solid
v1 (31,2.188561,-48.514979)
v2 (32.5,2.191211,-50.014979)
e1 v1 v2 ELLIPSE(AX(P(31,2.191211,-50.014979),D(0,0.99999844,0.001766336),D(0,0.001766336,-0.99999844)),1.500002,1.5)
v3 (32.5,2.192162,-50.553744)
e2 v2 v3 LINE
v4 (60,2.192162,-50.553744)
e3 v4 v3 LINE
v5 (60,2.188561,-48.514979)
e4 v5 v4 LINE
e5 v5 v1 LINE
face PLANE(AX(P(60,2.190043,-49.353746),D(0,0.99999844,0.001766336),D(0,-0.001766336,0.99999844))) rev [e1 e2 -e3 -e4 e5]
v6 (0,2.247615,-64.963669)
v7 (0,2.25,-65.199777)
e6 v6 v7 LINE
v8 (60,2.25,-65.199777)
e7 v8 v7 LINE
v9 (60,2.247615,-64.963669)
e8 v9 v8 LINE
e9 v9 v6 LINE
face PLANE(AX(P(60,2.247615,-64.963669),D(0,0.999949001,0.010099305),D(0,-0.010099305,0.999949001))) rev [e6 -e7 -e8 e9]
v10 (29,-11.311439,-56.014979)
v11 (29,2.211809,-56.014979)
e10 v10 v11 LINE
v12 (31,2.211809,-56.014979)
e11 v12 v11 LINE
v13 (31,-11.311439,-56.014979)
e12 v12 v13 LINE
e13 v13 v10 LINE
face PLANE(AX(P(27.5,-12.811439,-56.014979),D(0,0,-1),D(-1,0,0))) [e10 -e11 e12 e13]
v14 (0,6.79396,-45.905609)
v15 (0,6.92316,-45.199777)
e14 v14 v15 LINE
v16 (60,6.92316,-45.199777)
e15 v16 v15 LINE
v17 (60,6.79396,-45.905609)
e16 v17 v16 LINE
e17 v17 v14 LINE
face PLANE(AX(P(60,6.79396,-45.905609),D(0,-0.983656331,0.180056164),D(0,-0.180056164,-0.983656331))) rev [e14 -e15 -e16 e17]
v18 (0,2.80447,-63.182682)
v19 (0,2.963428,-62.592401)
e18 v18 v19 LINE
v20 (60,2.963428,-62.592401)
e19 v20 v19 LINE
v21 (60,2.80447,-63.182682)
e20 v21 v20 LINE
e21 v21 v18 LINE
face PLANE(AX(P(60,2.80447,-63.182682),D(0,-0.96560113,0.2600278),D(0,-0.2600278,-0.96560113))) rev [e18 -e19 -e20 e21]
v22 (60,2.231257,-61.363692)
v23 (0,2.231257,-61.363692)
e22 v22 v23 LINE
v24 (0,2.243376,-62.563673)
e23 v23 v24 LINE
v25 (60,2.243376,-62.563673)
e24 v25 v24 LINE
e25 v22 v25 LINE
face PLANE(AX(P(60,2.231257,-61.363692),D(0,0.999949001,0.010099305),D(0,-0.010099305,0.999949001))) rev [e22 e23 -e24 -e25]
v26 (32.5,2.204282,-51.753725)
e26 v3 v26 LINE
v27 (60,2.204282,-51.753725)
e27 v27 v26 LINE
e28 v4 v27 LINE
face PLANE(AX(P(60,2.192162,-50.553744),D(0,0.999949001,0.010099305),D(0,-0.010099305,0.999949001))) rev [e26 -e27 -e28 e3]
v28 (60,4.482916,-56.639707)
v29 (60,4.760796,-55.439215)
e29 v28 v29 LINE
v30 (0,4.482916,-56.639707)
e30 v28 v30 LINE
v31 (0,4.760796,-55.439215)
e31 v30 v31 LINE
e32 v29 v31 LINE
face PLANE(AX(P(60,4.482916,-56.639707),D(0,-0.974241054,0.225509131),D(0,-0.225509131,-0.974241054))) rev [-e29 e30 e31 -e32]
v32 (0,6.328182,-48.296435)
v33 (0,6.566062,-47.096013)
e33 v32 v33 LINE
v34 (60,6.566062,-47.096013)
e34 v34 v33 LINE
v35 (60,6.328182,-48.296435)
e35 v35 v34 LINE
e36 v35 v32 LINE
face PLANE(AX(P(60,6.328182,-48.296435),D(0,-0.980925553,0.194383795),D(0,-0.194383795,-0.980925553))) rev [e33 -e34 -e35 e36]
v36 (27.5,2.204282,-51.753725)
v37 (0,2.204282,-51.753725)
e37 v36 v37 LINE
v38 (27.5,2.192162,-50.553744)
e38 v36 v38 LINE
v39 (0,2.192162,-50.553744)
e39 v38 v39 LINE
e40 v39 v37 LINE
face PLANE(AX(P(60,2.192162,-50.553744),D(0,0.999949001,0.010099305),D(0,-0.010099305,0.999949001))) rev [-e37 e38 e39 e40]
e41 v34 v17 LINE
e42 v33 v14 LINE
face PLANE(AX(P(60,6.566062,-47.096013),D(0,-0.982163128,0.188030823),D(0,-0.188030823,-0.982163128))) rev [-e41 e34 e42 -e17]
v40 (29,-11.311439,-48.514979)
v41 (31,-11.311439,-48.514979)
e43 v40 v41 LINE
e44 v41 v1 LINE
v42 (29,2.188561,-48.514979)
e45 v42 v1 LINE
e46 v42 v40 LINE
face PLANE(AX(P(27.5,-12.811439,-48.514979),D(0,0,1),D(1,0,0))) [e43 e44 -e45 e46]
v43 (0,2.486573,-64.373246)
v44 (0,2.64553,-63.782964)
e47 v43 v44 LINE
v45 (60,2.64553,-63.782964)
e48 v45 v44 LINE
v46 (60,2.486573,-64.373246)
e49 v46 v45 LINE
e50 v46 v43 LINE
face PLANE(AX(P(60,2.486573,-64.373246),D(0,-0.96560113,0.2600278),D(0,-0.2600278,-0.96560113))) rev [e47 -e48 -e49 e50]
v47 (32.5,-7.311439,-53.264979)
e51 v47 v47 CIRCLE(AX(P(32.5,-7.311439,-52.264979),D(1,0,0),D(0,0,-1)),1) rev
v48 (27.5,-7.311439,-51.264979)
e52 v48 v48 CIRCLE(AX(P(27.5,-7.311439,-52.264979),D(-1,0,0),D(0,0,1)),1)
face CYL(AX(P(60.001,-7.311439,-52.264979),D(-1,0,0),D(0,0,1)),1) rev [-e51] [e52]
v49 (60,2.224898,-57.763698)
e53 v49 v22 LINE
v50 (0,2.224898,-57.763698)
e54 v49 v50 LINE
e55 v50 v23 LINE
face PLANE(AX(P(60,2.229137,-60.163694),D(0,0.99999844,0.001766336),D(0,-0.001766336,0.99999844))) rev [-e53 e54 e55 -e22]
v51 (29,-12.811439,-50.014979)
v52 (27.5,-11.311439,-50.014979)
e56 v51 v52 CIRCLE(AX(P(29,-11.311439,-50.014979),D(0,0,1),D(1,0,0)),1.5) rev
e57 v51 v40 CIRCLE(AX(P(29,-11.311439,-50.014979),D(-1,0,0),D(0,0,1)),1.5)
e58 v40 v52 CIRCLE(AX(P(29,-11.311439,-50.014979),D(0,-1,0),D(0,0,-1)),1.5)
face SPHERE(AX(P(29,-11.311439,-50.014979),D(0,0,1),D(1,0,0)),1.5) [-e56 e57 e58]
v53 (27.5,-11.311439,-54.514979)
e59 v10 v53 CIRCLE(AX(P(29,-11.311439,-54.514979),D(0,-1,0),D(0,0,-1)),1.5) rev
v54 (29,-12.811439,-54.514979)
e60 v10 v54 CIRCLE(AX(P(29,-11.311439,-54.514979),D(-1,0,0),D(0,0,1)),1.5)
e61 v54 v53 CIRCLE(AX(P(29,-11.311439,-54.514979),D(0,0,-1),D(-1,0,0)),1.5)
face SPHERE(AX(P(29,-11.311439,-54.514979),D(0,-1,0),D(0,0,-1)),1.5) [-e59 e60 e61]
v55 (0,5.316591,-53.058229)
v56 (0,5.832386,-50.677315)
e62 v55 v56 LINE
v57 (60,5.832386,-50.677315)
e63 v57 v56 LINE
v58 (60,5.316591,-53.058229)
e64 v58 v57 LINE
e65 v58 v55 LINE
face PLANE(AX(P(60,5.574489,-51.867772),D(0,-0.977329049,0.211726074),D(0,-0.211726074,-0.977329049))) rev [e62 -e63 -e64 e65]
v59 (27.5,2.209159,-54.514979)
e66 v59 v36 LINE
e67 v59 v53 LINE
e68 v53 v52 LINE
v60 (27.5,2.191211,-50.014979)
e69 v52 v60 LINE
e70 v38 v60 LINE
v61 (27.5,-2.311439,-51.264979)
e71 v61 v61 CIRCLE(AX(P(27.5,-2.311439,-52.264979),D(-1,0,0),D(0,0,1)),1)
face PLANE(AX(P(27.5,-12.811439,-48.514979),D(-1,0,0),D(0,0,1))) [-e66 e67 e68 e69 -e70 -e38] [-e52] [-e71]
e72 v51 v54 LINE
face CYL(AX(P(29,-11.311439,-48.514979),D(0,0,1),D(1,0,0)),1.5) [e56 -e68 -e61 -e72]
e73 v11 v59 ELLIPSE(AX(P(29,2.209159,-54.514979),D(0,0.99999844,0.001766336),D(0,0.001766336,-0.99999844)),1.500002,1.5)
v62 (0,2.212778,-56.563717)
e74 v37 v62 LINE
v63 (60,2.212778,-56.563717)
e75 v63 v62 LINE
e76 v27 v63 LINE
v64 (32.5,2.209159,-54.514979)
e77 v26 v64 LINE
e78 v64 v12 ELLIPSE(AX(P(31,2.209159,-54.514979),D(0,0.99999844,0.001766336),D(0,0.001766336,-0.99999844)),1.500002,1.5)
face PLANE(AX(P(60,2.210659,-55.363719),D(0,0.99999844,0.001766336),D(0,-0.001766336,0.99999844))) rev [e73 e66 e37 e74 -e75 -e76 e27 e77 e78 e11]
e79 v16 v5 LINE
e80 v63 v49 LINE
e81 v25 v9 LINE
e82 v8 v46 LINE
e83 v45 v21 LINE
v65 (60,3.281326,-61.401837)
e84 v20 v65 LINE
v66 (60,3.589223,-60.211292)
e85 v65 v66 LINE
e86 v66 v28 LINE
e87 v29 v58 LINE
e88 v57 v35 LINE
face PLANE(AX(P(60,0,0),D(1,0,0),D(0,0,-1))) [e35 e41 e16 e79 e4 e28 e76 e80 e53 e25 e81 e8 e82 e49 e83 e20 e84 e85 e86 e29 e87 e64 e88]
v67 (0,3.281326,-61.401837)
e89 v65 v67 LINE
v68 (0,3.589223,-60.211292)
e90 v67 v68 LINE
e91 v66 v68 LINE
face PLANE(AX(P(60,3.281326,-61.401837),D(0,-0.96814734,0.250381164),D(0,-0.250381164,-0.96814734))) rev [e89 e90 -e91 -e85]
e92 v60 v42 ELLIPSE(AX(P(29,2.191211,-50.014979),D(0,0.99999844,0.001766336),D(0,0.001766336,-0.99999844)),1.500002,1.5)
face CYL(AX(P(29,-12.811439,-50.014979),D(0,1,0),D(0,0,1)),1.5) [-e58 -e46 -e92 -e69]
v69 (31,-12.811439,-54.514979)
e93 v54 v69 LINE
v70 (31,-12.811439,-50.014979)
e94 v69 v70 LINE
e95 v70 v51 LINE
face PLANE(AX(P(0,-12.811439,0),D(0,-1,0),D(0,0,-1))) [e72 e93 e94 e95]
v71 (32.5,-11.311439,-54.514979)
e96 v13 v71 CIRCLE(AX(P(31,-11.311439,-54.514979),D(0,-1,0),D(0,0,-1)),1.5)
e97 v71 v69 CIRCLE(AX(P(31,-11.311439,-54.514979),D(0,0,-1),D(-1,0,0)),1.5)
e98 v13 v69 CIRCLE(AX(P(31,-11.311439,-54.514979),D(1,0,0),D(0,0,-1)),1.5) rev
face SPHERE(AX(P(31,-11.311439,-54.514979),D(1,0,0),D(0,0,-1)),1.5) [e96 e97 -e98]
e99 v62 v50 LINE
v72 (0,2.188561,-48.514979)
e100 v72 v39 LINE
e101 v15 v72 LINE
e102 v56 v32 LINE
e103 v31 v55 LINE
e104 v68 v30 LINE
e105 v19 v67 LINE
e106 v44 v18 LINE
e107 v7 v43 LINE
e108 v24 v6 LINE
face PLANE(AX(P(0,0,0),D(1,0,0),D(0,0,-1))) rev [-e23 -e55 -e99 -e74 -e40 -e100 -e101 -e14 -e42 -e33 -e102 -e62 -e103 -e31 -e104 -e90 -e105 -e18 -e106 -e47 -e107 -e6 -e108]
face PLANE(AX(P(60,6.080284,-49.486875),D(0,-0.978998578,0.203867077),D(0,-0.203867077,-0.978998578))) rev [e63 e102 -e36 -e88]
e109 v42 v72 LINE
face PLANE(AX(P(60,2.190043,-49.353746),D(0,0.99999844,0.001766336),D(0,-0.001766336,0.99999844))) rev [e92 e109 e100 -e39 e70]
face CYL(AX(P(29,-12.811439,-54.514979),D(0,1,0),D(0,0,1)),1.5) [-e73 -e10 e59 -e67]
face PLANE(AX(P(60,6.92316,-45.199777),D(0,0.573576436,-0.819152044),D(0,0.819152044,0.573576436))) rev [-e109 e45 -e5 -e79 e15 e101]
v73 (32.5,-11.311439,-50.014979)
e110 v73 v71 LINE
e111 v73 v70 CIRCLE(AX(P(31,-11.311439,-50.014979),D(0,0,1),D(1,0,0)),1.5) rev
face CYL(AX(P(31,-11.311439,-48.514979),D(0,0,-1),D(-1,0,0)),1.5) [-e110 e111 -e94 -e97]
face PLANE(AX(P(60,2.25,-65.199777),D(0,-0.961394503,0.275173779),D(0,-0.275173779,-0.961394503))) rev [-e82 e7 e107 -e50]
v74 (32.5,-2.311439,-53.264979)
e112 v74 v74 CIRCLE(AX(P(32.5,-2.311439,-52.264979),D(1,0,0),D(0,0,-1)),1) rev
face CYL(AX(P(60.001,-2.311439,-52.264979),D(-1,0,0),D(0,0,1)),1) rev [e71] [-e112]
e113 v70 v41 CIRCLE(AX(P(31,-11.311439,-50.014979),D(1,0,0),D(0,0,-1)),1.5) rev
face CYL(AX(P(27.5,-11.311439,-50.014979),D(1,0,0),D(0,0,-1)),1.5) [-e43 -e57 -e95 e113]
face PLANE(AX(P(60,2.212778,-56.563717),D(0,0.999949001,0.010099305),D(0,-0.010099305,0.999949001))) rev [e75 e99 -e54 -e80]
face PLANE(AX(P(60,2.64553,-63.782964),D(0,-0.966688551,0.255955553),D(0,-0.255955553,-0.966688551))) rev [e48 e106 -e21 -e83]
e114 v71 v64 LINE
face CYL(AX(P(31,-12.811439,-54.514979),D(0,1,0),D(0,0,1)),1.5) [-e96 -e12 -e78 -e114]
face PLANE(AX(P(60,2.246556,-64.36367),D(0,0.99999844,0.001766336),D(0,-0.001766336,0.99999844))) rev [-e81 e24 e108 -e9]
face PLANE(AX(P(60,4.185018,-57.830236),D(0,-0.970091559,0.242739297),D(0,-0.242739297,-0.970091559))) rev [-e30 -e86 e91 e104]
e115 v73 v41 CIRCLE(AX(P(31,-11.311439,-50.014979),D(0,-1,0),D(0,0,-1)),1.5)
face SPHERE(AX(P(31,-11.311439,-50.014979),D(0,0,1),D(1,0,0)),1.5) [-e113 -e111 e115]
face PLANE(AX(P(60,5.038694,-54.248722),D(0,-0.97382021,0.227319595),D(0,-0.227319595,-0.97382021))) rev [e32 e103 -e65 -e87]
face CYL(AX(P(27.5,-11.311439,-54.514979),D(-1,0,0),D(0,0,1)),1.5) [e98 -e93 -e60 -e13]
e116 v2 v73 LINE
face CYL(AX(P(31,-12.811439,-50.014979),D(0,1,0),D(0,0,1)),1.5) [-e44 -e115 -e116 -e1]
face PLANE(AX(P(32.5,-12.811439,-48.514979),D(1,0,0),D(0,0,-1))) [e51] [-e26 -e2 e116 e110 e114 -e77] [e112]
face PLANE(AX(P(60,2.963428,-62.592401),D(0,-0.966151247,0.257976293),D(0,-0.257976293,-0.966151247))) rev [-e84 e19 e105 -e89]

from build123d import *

# Parameters (mm, degrees)
BOSS_EXTRUDE1_DEPTH             = 60
BOSS_EXTRUDE2_REACH             = 90.732
SKETCH5_W                       = 5
SKETCH5_H                       = 7.5
BOSS_EXTRUDE2_DIRECTION_2_DEPTH = 15
FILLET1_R                       = 1.5
CUT_EXTRUDE1_REACH              = 75.969
SKETCH6_R                       = 1


# Read off the part's stored shape, not the designer's step: Boss-Extrude1
with BuildPart() as part:
    # Boss-Extrude1 outline → Boss-Extrude1 (new body)
    with BuildSketch(Plane(origin=(0, 0, 0), x_dir=(0, 0, -1), z_dir=(1, 0, 0))):
        Polygon((45.19977735, 6.923160404), (48.514979298, 2.188561349), (50.553744228, 2.192162497), (51.753724693, 2.204282084), (56.563717189, 2.212778158), (57.763697654, 2.224897745), (61.363692038, 2.231256553), (62.563672503, 2.24337614), (64.963668759, 2.247615346), (65.19977735, 2.25), (64.373245759, 2.486572833), (63.782964065, 2.645530446), (63.182682388, 2.804470395), (62.592400694, 2.963428007), (61.401837323, 3.281325569), (60.211291616, 3.589223146), (56.639707483, 4.482915924), (55.439214781, 4.760795885), (53.058229346, 5.316591132), (50.677314564, 5.832386443), (48.296435109, 6.328181784), (47.09601306, 6.566061807), (45.905608659, 6.793959509), align=None)
    extrude(amount=BOSS_EXTRUDE1_DEPTH)

    # Sketch5 → Boss-Extrude2 (add, up to next)
    with BuildSketch(Plane(origin=(0, 2.188561349, 0), x_dir=(1, 0, 0), z_dir=(0, 1, 0)), mode=Mode.PRIVATE) as boss_extrude2_sk1:
        with Locations((30, 52.264979298)):
            Rectangle(SKETCH5_W, SKETCH5_H)
    boss_extrude2_tool1 = extrude(boss_extrude2_sk1.sketch, amount=BOSS_EXTRUDE2_REACH, mode=Mode.PRIVATE) - part.part
    add(boss_extrude2_tool1.solids().sort_by_distance((30, 2.188561, -52.264979))[0])

    # Sketch5 → Boss-Extrude2 direction 2 (add)
    with BuildSketch(Plane(origin=(0, 2.188561349, 0), x_dir=(1, 0, 0), z_dir=(0, 1, 0))):
        with Locations((30, 52.264979298)):
            Rectangle(SKETCH5_W, SKETCH5_H)
    extrude(amount=-BOSS_EXTRUDE2_DIRECTION_2_DEPTH)

    # Fillet1
    fillet1_edges = [part.edges().sort_by_distance(p)[0] for p in [
        (27.5, -5.311438651, -48.514979298),
        (27.5, -12.811438651, -52.264979298),
        (27.5, -5.299814875, -56.014979298),
        (30, -12.811438651, -56.014979298),
        (32.5, -5.299814875, -56.014979298),
        (32.5, -12.811438651, -52.264979298),
        (30, -12.811438651, -48.514979298),
        (32.5, -5.311438651, -48.514979298),
    ]]
    fillet(fillet1_edges, radius=FILLET1_R)

    # Sketch6 → Cut-Extrude1 (cut, up to next)
    with BuildSketch(Plane.ZY.offset(-27.5), mode=Mode.PRIVATE) as cut_extrude1_sk1:
        with Locations((-52.264979298, -7.311438651)):
            Circle(SKETCH6_R)
    cut_extrude1_tool1 = extrude(cut_extrude1_sk1.sketch, amount=-CUT_EXTRUDE1_REACH, mode=Mode.PRIVATE) & part.part
    # Sketch6 → Cut-Extrude1 (cut, up to next)
    with BuildSketch(Plane.ZY.offset(-27.5), mode=Mode.PRIVATE) as cut_extrude1_sk2:
        with Locations((-52.264979298, -2.311438651)):
            Circle(SKETCH6_R)
    cut_extrude1_tool2 = extrude(cut_extrude1_sk2.sketch, amount=-CUT_EXTRUDE1_REACH, mode=Mode.PRIVATE) & part.part
    add(cut_extrude1_tool1.solids().sort_by_distance((27.5, -7.311439, -52.264979))[0], mode=Mode.SUBTRACT)
    add(cut_extrude1_tool2.solids().sort_by_distance((27.5, -2.311439, -52.264979))[0], mode=Mode.SUBTRACT)


solid = part.part
